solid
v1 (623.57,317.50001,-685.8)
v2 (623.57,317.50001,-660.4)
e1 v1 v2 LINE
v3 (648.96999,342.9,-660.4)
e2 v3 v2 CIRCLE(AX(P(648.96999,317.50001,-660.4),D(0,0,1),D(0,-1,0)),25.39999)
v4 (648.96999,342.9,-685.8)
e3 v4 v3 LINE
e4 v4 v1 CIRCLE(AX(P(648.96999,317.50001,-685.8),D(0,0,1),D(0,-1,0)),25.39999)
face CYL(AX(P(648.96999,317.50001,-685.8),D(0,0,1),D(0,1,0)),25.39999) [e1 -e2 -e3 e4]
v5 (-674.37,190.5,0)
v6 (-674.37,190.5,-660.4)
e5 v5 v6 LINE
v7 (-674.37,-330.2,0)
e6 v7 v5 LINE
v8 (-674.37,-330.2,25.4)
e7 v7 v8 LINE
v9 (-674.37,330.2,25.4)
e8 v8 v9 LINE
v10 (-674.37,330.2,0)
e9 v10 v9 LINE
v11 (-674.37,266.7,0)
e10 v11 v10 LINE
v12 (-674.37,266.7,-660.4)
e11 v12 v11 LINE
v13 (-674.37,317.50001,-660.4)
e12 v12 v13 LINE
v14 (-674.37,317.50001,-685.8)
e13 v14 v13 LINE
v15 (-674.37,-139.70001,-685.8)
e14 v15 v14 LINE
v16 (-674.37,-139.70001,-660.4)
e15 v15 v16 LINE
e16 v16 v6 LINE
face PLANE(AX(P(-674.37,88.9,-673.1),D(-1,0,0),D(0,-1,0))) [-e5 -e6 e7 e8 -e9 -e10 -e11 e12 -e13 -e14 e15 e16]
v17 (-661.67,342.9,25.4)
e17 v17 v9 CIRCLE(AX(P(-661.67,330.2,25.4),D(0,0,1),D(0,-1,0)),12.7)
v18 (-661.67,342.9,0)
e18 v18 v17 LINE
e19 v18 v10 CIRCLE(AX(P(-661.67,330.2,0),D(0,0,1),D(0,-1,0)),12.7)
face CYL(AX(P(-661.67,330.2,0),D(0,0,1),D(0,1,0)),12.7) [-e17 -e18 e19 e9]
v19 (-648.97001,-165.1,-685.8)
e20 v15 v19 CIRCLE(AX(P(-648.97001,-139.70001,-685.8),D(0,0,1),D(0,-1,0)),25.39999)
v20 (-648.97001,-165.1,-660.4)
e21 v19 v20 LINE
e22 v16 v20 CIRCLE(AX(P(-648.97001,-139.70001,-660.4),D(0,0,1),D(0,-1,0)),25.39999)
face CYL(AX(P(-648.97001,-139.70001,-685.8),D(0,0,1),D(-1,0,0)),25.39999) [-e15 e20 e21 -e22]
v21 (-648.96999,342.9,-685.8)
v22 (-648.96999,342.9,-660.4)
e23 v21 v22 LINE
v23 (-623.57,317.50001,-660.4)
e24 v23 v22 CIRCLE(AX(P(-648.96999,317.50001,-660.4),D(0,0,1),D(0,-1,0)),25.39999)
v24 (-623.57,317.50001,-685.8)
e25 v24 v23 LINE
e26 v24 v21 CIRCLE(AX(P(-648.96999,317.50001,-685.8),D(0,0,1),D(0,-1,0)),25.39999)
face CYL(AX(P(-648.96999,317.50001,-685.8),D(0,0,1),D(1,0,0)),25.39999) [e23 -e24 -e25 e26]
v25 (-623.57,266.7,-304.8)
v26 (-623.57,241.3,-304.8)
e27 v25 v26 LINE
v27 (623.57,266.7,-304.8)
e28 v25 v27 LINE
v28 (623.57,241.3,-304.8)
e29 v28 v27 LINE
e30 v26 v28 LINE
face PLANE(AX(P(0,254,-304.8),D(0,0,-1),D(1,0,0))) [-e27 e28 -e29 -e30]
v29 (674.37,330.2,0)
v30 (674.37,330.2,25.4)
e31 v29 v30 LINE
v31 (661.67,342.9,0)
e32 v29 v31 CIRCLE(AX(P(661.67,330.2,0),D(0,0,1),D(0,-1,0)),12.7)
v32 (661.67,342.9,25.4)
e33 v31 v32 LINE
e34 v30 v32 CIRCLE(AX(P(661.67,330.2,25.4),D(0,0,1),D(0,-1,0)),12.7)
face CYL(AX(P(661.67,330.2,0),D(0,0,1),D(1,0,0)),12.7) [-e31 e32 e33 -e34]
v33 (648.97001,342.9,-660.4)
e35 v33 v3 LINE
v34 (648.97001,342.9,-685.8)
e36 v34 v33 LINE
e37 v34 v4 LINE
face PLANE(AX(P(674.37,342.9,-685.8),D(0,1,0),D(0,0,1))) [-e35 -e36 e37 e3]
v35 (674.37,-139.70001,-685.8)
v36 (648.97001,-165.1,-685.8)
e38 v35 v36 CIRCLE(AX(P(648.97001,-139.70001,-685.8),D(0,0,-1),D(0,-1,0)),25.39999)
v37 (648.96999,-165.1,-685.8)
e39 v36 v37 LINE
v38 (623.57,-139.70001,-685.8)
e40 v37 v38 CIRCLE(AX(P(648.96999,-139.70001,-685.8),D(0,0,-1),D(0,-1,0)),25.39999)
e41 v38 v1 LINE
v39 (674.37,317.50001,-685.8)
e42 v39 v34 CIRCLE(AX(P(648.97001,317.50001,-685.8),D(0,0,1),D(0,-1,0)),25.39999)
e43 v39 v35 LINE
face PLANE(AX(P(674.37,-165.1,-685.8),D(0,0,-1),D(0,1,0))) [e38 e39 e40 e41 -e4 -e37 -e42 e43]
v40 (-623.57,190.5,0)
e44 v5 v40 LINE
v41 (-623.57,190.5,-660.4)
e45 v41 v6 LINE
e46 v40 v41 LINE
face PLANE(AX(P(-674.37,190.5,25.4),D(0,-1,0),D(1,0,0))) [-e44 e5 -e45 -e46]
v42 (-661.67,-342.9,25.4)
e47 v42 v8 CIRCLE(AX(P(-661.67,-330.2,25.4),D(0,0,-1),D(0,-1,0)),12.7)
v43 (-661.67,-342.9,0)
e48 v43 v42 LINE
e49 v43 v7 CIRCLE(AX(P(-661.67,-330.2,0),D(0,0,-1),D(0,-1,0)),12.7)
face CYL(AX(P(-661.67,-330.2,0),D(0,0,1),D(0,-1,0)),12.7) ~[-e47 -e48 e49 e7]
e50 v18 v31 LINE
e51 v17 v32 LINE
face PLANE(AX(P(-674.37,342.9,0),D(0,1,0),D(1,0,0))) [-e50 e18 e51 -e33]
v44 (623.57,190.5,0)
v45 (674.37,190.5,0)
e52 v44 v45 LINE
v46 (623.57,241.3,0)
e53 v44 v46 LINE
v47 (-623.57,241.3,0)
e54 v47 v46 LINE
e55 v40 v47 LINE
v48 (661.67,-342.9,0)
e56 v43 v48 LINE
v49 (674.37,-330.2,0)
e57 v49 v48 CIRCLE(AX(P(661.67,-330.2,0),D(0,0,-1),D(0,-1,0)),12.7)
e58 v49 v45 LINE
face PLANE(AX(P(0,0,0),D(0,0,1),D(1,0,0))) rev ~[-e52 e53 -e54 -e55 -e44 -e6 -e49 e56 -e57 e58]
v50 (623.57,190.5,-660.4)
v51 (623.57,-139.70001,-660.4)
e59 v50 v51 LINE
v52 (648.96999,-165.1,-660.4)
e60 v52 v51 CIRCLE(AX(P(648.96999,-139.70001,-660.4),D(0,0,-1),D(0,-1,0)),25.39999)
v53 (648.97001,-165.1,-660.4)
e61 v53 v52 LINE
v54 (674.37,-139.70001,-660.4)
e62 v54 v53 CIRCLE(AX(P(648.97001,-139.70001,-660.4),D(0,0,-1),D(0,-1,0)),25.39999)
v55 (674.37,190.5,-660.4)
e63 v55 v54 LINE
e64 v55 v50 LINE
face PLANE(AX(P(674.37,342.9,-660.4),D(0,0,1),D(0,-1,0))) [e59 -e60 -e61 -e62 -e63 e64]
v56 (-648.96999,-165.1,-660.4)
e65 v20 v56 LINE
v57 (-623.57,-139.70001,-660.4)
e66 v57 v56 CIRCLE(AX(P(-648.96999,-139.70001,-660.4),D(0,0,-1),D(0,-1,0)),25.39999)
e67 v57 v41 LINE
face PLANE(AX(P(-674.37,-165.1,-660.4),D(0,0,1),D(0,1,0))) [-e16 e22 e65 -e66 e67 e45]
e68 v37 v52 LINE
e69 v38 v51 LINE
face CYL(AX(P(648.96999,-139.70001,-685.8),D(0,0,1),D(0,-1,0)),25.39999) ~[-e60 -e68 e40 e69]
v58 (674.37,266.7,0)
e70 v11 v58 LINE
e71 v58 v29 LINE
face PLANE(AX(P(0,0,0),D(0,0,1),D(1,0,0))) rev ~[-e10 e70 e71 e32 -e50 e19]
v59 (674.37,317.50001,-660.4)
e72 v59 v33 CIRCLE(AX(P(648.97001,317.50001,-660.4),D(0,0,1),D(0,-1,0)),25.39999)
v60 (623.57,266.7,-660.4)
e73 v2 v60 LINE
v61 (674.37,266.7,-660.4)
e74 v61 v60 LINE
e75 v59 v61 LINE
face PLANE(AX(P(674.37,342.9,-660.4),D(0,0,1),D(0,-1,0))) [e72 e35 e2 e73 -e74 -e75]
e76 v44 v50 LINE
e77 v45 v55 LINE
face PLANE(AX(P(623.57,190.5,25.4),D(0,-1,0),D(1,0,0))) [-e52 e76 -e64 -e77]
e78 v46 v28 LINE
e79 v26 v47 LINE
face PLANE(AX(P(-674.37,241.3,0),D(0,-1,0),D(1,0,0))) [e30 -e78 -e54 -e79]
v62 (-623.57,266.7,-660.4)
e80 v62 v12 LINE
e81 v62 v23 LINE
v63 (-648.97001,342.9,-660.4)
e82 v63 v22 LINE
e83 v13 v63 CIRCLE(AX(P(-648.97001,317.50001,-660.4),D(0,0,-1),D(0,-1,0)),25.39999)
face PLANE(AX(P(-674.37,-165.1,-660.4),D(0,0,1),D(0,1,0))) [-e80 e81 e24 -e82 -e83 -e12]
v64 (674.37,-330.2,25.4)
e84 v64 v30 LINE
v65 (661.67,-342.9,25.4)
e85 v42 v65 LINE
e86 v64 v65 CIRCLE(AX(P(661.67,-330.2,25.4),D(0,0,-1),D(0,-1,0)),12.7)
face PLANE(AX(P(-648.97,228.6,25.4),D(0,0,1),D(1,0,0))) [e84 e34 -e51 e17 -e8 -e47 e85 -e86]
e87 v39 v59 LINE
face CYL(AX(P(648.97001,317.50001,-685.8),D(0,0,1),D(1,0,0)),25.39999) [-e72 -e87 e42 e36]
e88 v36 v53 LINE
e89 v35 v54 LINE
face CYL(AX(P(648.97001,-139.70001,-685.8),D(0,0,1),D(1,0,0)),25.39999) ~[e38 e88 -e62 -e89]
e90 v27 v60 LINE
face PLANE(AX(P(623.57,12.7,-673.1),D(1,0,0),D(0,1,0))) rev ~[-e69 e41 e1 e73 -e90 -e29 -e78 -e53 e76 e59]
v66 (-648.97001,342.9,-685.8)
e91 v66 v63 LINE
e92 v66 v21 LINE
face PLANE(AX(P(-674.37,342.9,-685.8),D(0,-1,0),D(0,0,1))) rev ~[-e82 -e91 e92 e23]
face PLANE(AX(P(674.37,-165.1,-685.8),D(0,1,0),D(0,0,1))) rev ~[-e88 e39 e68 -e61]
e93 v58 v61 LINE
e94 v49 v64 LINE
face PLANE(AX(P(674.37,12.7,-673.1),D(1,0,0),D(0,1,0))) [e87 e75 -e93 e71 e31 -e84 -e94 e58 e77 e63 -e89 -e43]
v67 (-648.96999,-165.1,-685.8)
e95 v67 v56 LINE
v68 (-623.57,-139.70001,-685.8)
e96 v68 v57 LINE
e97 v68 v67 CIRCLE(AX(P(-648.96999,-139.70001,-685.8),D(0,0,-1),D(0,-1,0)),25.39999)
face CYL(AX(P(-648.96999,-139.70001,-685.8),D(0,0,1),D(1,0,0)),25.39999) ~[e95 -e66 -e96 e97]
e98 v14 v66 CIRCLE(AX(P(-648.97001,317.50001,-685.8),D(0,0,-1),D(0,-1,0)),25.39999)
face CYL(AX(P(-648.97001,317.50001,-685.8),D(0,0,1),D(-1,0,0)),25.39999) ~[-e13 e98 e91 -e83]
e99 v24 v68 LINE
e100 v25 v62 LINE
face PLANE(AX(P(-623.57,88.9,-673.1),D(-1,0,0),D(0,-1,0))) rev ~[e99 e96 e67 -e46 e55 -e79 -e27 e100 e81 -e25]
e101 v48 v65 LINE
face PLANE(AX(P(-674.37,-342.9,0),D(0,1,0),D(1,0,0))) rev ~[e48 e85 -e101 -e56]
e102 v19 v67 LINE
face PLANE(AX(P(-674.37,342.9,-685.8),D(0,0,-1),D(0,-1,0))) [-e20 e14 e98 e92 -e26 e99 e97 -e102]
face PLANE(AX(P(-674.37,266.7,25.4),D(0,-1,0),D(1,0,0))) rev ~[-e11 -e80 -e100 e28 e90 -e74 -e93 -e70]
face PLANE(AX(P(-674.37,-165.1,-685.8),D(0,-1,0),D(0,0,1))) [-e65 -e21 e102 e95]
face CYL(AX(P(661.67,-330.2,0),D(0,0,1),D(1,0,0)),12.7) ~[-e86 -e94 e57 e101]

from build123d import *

# Parameters (mm, degrees)
F0_W     = 1348.74
F0_H     = 685.8
F1_DEPTH = 25.4
F2_W     = 50.8
F2_H     = 76.2
F3_DEPTH = 711.2
F4_W     = 508
F4_H     = 25.4
F4_W_2   = 76.2
F5_DEPTH = 50.8
F6_W     = 355.6
F6_H     = 25.4
F6_W_2   = 76.2
F7_DEPTH = 50.8
F8_W     = 1348.74
F8_H     = 25.4
F9_DEPTH = 304.8
F10_R    = 12.7
F11_R    = 25.39999


# Not quite as in the source:
# - a fillet or chamfer is up to 0.001 mm smaller than in the source, because OpenCascade refuses the exact size


with BuildPart() as f1:
    # F0 (on Top) → F1 (new body)
    with BuildSketch(Plane.XY):
        Rectangle(F0_W, F0_H)
    extrude(amount=F1_DEPTH)

    # F2 (on face) → F3 (join)
    with BuildSketch(Plane.XY.offset(25.4)):
        with Locations((-648.97, 228.6)):
            Rectangle(F2_W, F2_H)
        with Locations((648.97, 228.6)):
            Rectangle(F2_W, F2_H)
    extrude(amount=-F3_DEPTH)

    # F4 (on face) → F5 (join)
    with BuildSketch(Plane(origin=(-674.37, 0, 0), x_dir=(0, -1, 0), z_dir=(-1, 0, 0))):
        with Locations((-88.9, -673.1)):
            Rectangle(F4_W, F4_H)
        with Locations((-304.8, -673.1)):
            Rectangle(F4_W_2, F4_H)
    extrude(amount=-F5_DEPTH)

    # F6 (on face) → F7 (join)
    with BuildSketch(Plane.YZ.offset(674.37)):
        with Locations((12.7, -673.1)):
            Rectangle(F6_W, F6_H)
        with Locations((228.6, -673.1)):
            Rectangle(F6_W_2, F6_H)
        with Locations((304.8, -673.1)):
            Rectangle(F6_W_2, F6_H)
    extrude(amount=-F7_DEPTH)

    # F8 (on face) → F9 (join)
    with BuildSketch(Plane(origin=(0, 0, 0), x_dir=(1, 0, 0), z_dir=(0, 0, -1))):
        with Locations((0, -254)):
            Rectangle(F8_W, F8_H)
    extrude(amount=F9_DEPTH)

    # F10
    f10_edges = [f1.edges().sort_by_distance(p)[0] for p in [
        (674.37, -342.9, 12.7),
        (-674.37, -342.9, 12.7),
        (-674.37, 342.9, 12.7),
        (674.37, 342.9, 12.7),
    ]]
    fillet(f10_edges, radius=F10_R)

    # F11 (radius 25.4 in the source; OpenCascade refuses exactly that, so slightly less here)
    f11_edges = [f1.edges().sort_by_distance(p)[0] for p in [
        (-623.57, -165.1, -673.1),
        (-674.37, -165.1, -673.1),
        (674.37, -165.1, -673.1),
        (623.57, -165.1, -673.1),
        (674.37, 342.9, -673.1),
        (623.57, 342.9, -673.1),
        (-674.37, 342.9, -673.1),
        (-623.57, 342.9, -673.1),
    ]]
    fillet(f11_edges, radius=F11_R)


solid = f1.part
